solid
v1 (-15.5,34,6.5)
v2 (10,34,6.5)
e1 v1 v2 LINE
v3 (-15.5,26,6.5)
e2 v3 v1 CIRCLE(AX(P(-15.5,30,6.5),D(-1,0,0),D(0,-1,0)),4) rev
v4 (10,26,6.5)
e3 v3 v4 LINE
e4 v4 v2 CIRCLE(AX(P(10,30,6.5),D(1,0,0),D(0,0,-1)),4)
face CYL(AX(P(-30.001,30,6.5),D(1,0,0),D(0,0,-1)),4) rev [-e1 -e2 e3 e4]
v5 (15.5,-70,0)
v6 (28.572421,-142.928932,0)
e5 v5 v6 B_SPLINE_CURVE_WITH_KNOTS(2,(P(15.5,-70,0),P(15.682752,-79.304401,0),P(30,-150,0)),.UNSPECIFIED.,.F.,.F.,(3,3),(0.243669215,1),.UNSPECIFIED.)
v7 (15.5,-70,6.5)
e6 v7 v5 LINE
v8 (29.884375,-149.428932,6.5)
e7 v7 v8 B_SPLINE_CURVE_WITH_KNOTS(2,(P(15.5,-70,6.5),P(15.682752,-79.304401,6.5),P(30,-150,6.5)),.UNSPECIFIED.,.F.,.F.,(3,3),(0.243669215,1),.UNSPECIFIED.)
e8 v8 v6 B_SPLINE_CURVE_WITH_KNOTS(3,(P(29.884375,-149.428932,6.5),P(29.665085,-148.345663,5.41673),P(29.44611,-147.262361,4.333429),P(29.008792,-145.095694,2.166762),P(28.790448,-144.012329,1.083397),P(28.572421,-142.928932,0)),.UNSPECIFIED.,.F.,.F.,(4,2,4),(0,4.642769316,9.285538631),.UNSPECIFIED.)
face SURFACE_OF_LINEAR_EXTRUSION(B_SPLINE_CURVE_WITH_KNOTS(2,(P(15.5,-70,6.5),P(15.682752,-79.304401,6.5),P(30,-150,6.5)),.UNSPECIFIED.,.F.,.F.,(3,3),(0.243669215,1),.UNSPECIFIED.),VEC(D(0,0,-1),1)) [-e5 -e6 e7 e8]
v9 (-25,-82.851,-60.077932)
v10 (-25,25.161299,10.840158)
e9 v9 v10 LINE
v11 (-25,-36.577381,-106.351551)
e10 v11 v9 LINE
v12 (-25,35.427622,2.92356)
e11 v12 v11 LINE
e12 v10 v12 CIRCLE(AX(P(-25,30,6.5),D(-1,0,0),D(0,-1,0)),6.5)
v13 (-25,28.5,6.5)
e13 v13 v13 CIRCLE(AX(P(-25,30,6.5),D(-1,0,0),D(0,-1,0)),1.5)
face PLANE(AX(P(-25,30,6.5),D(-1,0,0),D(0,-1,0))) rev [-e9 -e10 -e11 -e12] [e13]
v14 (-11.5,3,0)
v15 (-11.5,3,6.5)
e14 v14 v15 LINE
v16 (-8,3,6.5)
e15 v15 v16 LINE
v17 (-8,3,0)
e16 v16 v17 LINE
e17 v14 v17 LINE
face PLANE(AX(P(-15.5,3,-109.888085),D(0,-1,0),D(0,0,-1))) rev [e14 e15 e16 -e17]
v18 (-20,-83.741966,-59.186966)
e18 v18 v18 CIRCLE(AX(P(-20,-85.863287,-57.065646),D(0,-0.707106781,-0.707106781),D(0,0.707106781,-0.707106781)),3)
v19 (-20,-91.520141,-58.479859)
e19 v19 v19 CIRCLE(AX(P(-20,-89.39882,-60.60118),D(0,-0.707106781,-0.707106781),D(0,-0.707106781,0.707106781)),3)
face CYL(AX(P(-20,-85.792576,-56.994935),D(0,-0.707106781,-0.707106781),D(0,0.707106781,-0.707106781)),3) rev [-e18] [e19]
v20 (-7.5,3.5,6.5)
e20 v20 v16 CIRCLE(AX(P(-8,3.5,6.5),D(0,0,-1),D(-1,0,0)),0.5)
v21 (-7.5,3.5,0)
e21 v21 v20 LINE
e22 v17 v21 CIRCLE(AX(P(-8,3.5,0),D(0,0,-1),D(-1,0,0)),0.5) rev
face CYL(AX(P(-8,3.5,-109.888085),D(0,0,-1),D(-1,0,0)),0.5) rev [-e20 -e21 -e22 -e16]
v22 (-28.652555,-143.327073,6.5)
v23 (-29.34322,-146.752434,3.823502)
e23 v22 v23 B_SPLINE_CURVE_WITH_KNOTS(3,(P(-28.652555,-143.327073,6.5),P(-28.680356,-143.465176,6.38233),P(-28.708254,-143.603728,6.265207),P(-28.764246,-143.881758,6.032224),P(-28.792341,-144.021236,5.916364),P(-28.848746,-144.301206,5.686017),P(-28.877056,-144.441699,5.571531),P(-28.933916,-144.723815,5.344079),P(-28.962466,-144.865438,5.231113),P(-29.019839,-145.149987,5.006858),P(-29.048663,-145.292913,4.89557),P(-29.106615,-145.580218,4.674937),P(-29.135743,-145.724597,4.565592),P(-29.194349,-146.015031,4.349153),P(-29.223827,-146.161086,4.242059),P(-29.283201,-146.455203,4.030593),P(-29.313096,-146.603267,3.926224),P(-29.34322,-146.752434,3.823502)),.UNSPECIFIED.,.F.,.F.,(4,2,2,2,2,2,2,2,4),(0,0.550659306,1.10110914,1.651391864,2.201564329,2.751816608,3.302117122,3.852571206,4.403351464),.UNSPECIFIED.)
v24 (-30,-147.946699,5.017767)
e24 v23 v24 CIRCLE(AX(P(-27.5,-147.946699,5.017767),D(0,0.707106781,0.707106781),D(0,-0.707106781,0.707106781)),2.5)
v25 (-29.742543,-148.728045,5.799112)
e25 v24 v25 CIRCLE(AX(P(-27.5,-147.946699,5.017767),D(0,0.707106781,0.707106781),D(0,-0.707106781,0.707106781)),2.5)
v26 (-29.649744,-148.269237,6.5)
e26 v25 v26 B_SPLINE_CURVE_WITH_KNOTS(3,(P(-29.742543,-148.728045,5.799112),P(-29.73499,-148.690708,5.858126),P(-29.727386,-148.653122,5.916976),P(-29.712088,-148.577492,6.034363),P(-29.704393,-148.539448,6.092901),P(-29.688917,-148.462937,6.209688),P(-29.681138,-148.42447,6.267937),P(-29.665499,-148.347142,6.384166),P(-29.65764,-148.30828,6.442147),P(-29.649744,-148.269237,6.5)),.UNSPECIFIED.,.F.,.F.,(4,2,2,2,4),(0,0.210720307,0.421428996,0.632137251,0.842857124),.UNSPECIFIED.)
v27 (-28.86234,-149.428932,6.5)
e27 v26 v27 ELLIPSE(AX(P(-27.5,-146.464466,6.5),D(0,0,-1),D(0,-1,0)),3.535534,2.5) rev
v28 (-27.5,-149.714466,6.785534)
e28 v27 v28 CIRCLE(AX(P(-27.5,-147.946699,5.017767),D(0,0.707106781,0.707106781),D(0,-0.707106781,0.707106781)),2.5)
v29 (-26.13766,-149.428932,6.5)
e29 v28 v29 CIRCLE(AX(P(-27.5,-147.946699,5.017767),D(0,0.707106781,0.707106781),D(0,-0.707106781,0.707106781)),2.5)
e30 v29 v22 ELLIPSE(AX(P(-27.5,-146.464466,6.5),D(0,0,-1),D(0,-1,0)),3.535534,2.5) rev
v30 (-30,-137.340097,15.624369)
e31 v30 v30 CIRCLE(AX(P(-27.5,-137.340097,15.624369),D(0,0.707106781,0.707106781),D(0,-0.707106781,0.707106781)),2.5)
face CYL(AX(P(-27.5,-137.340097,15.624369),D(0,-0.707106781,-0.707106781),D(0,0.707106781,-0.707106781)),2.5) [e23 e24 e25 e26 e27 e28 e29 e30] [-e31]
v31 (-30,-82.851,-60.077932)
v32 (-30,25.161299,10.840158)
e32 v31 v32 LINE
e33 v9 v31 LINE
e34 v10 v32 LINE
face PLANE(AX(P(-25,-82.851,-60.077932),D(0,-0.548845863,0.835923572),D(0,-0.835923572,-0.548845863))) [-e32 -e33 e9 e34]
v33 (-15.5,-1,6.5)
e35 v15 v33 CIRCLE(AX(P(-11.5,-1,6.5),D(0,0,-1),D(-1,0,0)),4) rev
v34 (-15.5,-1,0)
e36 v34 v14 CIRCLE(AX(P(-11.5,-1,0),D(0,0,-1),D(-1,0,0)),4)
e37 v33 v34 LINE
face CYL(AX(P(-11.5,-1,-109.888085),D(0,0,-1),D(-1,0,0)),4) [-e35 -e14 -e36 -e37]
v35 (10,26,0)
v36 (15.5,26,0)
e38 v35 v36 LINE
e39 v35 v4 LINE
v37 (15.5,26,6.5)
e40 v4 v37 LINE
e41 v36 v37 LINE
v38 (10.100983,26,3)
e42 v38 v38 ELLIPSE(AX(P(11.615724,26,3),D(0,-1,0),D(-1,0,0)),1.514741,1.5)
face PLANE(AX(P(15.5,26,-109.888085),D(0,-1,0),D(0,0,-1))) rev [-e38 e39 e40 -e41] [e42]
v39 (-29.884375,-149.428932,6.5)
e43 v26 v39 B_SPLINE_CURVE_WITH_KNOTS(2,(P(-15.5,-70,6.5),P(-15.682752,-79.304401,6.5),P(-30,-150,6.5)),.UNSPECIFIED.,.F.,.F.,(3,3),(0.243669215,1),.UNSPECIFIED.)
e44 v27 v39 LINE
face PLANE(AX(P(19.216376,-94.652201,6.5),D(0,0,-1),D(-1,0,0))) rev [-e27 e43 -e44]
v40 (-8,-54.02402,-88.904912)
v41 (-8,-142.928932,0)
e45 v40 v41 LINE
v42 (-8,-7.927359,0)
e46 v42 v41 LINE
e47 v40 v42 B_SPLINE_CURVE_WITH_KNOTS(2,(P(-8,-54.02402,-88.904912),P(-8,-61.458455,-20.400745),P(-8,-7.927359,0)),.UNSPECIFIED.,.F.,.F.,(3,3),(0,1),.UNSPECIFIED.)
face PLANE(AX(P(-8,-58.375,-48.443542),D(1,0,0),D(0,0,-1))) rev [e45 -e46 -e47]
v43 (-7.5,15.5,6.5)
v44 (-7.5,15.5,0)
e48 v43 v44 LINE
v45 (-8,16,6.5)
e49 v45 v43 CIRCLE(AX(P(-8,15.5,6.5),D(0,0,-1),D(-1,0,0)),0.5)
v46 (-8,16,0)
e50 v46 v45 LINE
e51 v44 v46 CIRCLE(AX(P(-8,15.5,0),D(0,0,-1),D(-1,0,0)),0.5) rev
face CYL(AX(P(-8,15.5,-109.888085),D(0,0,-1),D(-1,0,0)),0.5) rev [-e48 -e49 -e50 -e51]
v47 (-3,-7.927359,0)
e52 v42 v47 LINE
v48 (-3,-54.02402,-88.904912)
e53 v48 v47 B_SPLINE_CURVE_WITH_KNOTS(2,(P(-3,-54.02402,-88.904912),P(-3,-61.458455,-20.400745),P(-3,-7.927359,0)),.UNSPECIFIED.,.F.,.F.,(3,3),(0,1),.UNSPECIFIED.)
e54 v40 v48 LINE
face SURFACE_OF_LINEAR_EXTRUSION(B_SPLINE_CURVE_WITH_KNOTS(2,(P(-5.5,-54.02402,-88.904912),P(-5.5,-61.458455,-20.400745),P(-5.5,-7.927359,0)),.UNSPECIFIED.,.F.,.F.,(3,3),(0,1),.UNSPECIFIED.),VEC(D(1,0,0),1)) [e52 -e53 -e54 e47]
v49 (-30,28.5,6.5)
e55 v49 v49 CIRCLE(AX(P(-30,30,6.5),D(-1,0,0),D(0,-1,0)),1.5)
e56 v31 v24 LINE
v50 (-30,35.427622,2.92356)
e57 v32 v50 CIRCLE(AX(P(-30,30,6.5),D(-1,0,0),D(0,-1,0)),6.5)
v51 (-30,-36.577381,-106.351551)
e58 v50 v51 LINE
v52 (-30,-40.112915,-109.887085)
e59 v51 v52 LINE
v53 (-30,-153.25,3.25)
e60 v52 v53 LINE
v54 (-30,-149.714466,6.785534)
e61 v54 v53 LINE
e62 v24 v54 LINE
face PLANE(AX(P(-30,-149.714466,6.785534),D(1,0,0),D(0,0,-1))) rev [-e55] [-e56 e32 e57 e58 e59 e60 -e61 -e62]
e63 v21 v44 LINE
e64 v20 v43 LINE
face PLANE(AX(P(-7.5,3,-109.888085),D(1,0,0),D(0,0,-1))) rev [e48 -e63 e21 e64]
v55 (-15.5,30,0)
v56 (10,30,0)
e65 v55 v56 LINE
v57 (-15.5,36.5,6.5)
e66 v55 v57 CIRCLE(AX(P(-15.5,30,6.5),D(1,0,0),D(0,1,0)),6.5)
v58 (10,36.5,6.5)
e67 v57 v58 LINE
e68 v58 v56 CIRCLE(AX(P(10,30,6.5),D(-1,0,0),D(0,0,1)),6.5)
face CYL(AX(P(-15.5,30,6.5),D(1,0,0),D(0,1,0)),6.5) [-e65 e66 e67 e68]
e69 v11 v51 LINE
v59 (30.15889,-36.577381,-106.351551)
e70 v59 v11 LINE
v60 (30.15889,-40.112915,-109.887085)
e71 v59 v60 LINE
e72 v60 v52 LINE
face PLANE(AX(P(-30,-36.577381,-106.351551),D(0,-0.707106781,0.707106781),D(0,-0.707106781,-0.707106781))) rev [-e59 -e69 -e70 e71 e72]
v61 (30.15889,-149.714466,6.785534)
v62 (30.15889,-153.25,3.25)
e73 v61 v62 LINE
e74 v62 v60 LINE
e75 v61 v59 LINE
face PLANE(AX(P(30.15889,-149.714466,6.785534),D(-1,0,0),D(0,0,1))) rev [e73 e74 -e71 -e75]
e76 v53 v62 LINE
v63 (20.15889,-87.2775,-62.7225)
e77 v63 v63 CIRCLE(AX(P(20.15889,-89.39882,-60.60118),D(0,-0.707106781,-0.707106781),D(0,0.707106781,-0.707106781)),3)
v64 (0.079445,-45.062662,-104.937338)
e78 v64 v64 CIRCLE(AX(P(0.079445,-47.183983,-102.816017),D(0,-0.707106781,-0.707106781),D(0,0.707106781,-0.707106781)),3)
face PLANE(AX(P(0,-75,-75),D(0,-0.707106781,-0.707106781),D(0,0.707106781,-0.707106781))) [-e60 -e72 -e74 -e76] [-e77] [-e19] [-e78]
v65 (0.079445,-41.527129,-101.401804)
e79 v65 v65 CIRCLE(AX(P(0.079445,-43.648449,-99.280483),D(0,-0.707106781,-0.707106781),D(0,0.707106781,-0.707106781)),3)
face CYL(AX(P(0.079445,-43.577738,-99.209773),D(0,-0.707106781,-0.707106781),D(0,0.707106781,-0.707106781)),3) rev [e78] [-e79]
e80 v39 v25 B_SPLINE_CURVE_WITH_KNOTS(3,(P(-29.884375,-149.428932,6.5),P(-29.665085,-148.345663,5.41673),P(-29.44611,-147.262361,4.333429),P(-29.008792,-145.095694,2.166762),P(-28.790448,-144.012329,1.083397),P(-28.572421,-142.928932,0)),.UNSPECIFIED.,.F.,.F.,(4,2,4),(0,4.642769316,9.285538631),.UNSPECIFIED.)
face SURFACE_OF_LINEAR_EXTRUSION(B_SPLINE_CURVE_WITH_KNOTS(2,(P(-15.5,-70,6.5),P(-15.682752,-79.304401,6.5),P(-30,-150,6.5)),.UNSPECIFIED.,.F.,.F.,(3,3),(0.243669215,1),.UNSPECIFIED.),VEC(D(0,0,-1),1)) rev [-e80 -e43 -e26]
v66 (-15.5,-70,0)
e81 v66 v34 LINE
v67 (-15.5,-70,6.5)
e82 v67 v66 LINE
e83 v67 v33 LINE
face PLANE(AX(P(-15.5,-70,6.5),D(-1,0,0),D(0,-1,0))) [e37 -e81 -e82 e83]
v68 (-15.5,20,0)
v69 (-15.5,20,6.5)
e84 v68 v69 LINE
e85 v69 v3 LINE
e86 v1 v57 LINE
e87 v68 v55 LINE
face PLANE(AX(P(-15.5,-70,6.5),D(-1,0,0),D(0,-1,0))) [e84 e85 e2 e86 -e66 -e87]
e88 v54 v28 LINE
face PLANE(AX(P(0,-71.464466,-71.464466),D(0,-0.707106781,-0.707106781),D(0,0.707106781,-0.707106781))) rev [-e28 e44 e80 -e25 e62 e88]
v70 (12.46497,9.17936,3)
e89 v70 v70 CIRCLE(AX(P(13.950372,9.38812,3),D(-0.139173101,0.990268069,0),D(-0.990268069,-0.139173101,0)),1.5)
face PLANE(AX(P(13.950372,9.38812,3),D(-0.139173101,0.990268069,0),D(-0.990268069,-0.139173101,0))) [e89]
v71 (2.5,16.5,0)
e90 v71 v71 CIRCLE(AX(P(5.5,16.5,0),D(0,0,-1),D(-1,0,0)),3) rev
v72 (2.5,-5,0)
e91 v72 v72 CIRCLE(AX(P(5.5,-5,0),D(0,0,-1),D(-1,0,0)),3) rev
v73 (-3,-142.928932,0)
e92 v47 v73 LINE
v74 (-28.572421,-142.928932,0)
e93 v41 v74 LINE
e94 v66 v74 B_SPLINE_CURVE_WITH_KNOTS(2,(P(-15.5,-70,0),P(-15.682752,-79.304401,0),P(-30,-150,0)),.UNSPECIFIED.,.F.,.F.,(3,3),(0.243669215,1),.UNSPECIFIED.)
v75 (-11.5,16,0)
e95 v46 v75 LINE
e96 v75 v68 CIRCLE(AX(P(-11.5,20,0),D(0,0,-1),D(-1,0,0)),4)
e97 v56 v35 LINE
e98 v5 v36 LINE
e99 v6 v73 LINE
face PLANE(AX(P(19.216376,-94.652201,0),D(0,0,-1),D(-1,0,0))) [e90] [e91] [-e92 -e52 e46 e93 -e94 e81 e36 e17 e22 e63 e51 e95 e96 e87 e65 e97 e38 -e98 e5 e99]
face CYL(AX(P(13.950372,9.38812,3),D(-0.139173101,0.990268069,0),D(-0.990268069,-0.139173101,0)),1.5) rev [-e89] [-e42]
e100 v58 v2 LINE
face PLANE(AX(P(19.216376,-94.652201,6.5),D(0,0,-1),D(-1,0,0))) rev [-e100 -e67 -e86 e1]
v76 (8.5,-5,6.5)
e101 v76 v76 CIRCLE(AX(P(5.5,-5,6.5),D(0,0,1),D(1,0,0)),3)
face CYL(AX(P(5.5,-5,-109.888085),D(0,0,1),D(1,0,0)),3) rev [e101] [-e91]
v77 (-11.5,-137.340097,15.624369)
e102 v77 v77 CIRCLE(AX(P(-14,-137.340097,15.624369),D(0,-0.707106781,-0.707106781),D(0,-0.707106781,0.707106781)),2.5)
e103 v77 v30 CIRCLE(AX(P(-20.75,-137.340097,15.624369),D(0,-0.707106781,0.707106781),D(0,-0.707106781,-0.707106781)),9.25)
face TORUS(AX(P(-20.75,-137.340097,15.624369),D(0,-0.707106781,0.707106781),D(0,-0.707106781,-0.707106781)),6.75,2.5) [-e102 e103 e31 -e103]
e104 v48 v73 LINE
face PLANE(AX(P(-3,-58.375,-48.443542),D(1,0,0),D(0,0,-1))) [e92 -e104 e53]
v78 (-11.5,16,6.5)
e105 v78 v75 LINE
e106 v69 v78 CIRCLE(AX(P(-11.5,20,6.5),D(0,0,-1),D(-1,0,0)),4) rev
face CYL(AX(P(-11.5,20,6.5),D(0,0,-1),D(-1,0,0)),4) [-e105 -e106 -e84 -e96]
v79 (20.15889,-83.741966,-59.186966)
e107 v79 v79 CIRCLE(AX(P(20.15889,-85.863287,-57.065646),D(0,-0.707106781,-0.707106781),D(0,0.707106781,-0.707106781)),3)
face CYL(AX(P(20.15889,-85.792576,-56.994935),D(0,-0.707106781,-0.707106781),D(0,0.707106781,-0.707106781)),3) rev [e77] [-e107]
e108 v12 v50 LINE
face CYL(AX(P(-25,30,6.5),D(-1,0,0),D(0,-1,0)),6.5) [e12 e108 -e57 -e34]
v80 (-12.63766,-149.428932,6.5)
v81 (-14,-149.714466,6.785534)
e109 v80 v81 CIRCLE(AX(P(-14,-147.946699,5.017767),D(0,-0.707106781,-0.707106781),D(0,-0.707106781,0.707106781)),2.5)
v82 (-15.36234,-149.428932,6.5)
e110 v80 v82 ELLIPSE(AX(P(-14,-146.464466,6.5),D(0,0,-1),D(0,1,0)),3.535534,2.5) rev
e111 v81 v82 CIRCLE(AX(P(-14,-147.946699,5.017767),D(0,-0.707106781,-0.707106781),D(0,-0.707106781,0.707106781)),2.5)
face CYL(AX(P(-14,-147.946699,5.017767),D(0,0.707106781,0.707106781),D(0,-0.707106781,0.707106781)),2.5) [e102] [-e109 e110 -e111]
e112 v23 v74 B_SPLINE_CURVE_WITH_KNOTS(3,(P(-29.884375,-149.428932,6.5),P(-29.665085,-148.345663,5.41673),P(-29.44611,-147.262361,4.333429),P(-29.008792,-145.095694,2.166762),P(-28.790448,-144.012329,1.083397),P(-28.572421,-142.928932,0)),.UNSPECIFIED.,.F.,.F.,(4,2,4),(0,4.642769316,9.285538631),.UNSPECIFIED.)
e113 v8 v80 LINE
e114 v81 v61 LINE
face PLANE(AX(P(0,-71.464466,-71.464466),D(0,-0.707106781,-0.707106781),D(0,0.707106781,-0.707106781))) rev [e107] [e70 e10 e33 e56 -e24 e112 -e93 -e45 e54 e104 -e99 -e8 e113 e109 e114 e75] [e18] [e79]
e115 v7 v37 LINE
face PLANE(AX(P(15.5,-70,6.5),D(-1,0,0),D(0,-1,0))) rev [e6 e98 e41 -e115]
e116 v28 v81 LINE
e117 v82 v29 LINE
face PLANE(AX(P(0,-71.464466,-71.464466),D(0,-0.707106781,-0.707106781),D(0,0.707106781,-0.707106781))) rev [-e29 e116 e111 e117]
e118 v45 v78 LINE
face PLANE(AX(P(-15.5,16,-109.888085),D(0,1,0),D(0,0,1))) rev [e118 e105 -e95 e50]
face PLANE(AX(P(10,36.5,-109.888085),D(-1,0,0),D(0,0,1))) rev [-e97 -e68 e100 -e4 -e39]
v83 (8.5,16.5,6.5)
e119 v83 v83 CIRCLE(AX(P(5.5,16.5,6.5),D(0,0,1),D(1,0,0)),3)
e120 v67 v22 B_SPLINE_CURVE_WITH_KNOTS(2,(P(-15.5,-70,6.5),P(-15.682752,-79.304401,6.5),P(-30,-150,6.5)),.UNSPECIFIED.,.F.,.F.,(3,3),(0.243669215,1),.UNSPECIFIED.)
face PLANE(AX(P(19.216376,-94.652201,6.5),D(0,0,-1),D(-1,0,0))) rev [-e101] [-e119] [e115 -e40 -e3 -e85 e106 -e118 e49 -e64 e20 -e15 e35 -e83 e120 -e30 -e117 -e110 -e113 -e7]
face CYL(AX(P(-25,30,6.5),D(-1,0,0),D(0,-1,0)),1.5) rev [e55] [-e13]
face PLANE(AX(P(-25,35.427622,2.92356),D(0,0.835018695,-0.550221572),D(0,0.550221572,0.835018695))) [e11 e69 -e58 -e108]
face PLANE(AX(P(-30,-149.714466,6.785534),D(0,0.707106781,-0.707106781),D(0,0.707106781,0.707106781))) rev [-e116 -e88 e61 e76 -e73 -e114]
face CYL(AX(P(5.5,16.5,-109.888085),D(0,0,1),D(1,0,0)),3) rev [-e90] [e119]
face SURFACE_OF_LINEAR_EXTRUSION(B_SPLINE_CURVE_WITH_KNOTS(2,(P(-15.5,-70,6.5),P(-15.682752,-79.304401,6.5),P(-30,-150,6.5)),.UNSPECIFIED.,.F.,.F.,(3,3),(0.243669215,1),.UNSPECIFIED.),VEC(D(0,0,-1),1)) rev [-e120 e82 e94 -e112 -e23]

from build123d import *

# Parameters (mm, degrees)
BOSS_EXTRUDE1_DEPTH = 6.5
SKETCH2_W           = 60.158889846
SKETCH2_H           = 160
BOSS_EXTRUDE3_DEPTH = 5
SKETCH6_R           = 3
CUT_EXTRUDE7_DEPTH  = 5.1
BOSS_EXTRUDE4_DEPTH = 31
CUT_EXTRUDE8_REACH  = 196.785
SKETCH11_W          = 5.5
SKETCH11_H          = 10.5
CUT_EXTRUDE9_REACH  = 194.771
SKETCH13_R          = 1.5
CUT_EXTRUDE10_DEPTH = 17
CUT_EXTRUDE11_REACH = 196.785
SKETCH14_R          = 3
BOSS_EXTRUDE5_START = -5
SKETCH15_R          = 1.5
BOSS_EXTRUDE5_DEPTH = 5
RIB2_START          = -2.5
RIB2_DEPTH          = 5
CUT_EXTRUDE12_REACH = 196.785
SKETCH17_W          = 8
SKETCH17_H          = 13
FILLET1_R           = 4
FILLET2_R           = 0.5
SWEEP1_PROFILE_R    = 2.5


# Read off the part's stored shape, not the designer's step: Rib2
with BuildPart() as part:
    # Sketch1 → Boss-Extrude1 (new body)
    with BuildSketch(Plane.XY):
        with BuildLine():
            Line((-15.5, -70), (-15.5, 30))
            Line((-15.5, 30), (15.5, 30))
            Line((15.5, 30), (15.5, -70))
            add(Edge.make_bspline(
                [(15.5, -70), (15.682751911, -79.304401058), (30, -150)],
                knots=[0.243669215, 0.243669215, 0.243669215, 1, 1, 1], degree=2))
            Line((30, -150), (-30, -150))
            add(Edge.make_bspline(
                [(-15.5, -70), (-15.682751911, -79.304401058), (-30, -150)],
                knots=[0.243669215, 0.243669215, 0.243669215, 1, 1, 1], degree=2))
        make_face()
    extrude(amount=BOSS_EXTRUDE1_DEPTH)

    # Sketch2 → Boss-Extrude3 (add)
    with BuildSketch(Plane(origin=(0, -75, -75), x_dir=(1, 0, 0), z_dir=(0, 0.7071067811865488, 0.7071067811865464))):
        with Locations((0.079444923, -30.662211256)):
            Rectangle(SKETCH2_W, SKETCH2_H)
    extrude(amount=BOSS_EXTRUDE3_DEPTH)

    # Sketch6 → Cut-Extrude7 (cut)
    with BuildSketch(Plane(origin=(0, -75, -75), x_dir=(-1, 0, 0), z_dir=(0, -0.7071067811865487, -0.7071067811865464))):
        with Locations(Location((-20.158889846, -20.363007156, 0), (0, 0, 90))):
            Circle(SKETCH6_R)
        with Locations(Location((20, -20.363007156, 0), (0, 0, 90))):
            Circle(SKETCH6_R)
        with Locations(Location((-0.079444923, 39.337788744, 0), (0, 0, 90))):
            Circle(SKETCH6_R)
    extrude(amount=-CUT_EXTRUDE7_DEPTH, mode=Mode.SUBTRACT)

    # Sketch10 → Boss-Extrude4 (add)
    with BuildSketch(Plane(origin=(15.5, 0, 0), x_dir=(0, 0, -1), z_dir=(1, 0, 0))):
        with BuildLine():
            Line((-6.5, 36.5), (-6.5, 30))
            Line((-6.5, 30), (0, 30))
            ThreePointArc((0, 30), (-1.903805922, 34.596194078), (-6.5, 36.5))
        make_face()
    extrude(amount=-BOSS_EXTRUDE4_DEPTH)

    # Sketch11 → Cut-Extrude8 (cut, up to next)
    with BuildSketch(Plane.XY.offset(6.5), mode=Mode.PRIVATE) as cut_extrude8_sk1:
        with Locations((12.75, 31.25)):
            Rectangle(SKETCH11_W, SKETCH11_H)
    cut_extrude8_tool1 = extrude(cut_extrude8_sk1.sketch, amount=-CUT_EXTRUDE8_REACH, mode=Mode.PRIVATE) & part.part
    add(cut_extrude8_tool1.solids().sort_by_distance((12.75, 31.25, 6.5))[0], mode=Mode.SUBTRACT)

    # Sketch12 → Cut-Extrude9 (cut, up to next)
    with BuildSketch(Plane(origin=(10, 0, 0), x_dir=(0, 0, -1), z_dir=(1, 0, 0)), mode=Mode.PRIVATE) as cut_extrude9_sk1:
        with BuildLine():
            Line((-6.5, 34), (-6.5, 26))
            ThreePointArc((-6.5, 26), (-2.5, 30), (-6.5, 34))
        make_face()
    cut_extrude9_tool1 = extrude(cut_extrude9_sk1.sketch, amount=-CUT_EXTRUDE9_REACH, mode=Mode.PRIVATE) & part.part
    add(cut_extrude9_tool1.solids().sort_by_distance((10, 30, 4.802347))[0], mode=Mode.SUBTRACT)

    # Sketch13 → Cut-Extrude10 (cut)
    with BuildSketch(Plane(origin=(-3.389594105, 24.118215268, 0), x_dir=(0, 0, 1), z_dir=(-0.13917310096006605, 0.9902680687415703, 0))):
        with Locations(Location((3, 15.121181312, 0), (0, 0, 270))):
            Circle(SKETCH13_R)
    extrude(amount=-CUT_EXTRUDE10_DEPTH, mode=Mode.SUBTRACT)

    # Sketch14 → Cut-Extrude11 (cut, up to next)
    with BuildSketch(Plane.XY.offset(6.5), mode=Mode.PRIVATE) as cut_extrude11_sk1:
        with Locations((5.5, 16.5)):
            Circle(SKETCH14_R)
    cut_extrude11_tool1 = extrude(cut_extrude11_sk1.sketch, amount=-CUT_EXTRUDE11_REACH, mode=Mode.PRIVATE) & part.part
    # Sketch14 → Cut-Extrude11 (cut, up to next)
    with BuildSketch(Plane.XY.offset(6.5), mode=Mode.PRIVATE) as cut_extrude11_sk2:
        with Locations((5.5, -5)):
            Circle(SKETCH14_R)
    cut_extrude11_tool2 = extrude(cut_extrude11_sk2.sketch, amount=-CUT_EXTRUDE11_REACH, mode=Mode.PRIVATE) & part.part
    add(cut_extrude11_tool1.solids().sort_by_distance((5.5, 16.5, 6.5))[0], mode=Mode.SUBTRACT)
    add(cut_extrude11_tool2.solids().sort_by_distance((5.5, -5, 6.5))[0], mode=Mode.SUBTRACT)

    # Sketch15 → Boss-Extrude5 (add)
    with BuildSketch(Plane.ZY.offset(30).offset(BOSS_EXTRUDE5_START)):
        with BuildLine():
            Line((2.923559779, 35.427621518), (-106.351551084, -36.577381104))
            Line((-106.351551084, -36.577381104), (-60.077932214, -82.850999974))
            Line((-60.077932214, -82.850999974), (10.840158065, 25.161298937))
            ThreePointArc((10.840158065, 25.161298937), (11.647345051, 33.969236568), (2.923559779, 35.427621518))
        make_face()
        with Locations(Location((6.5, 30, 0), (0, 0, 270))):
            Circle(SKETCH15_R, mode=Mode.SUBTRACT)
    extrude(amount=BOSS_EXTRUDE5_DEPTH)

    # Rib2 outline → Rib2 (add)
    with BuildSketch(Plane(origin=(-5.5, 0, 0), x_dir=(0, 0, -1), z_dir=(1, 0, 0)).offset(RIB2_START)):
        with BuildLine():
            Line((0, -142.928932188), (88.904911914, -54.024020274))
            add(Edge.make_bspline(
                [(88.904911914, -54.024020274), (20.400745035, -61.458454661), (0, -7.927359395)],
                knots=[0, 0, 0, 1, 1, 1], degree=2))
            Line((0, -7.927359395), (0, -142.928932188))
        make_face()
    extrude(amount=RIB2_DEPTH)

    # Sketch17 → Cut-Extrude12 (cut, up to next)
    with BuildSketch(Plane.XY.offset(6.5), mode=Mode.PRIVATE) as cut_extrude12_sk1:
        with Locations((-11.5, 9.5)):
            Rectangle(SKETCH17_W, SKETCH17_H)
    cut_extrude12_tool1 = extrude(cut_extrude12_sk1.sketch, amount=-CUT_EXTRUDE12_REACH, mode=Mode.PRIVATE) & part.part
    add(cut_extrude12_tool1.solids().sort_by_distance((-11.5, 9.5, 6.5))[0], mode=Mode.SUBTRACT)

    # Fillet1
    fillet1_edges = [part.edges().sort_by_distance(p)[0] for p in [
        (-15.5, 3, 3.25),
        (-15.5, 16, 3.25),
    ]]
    fillet(fillet1_edges, radius=FILLET1_R)

    # Fillet2
    fillet2_edges = [part.edges().sort_by_distance(p)[0] for p in [
        (-7.5, 16, 3.25),
        (-7.5, 3, 3.25),
    ]]
    fillet(fillet2_edges, radius=FILLET2_R)

    # Sweep1: sweep along a path in Sketch18
    with BuildLine(Plane(origin=(0, -76.482233047, 76.482233047), x_dir=(-1, 0, 0), z_dir=(0, -0.7071067811865464, 0.7071067811865488))) as sweep1_path:
        Line((27.5, 101.066017178), (27.5, 86.066017178))
        ThreePointArc((27.5, 86.066017178), (20.75, 79.316017178), (14, 86.066017178))
        Line((14, 86.066017178), (14, 101.066017178))
    # Sweep1 profile (on start of the path) → Sweep1 (sweep)
    with BuildSketch(Plane(origin=(-27.5, -147.946699141, 5.017766953), x_dir=(0, -0.7071067811865464, 0.7071067811865488), z_dir=(0, 0.7071067811865488, 0.7071067811865464))):
        Circle(SWEEP1_PROFILE_R)
    sweep(path=sweep1_path.line)


solid = part.part
